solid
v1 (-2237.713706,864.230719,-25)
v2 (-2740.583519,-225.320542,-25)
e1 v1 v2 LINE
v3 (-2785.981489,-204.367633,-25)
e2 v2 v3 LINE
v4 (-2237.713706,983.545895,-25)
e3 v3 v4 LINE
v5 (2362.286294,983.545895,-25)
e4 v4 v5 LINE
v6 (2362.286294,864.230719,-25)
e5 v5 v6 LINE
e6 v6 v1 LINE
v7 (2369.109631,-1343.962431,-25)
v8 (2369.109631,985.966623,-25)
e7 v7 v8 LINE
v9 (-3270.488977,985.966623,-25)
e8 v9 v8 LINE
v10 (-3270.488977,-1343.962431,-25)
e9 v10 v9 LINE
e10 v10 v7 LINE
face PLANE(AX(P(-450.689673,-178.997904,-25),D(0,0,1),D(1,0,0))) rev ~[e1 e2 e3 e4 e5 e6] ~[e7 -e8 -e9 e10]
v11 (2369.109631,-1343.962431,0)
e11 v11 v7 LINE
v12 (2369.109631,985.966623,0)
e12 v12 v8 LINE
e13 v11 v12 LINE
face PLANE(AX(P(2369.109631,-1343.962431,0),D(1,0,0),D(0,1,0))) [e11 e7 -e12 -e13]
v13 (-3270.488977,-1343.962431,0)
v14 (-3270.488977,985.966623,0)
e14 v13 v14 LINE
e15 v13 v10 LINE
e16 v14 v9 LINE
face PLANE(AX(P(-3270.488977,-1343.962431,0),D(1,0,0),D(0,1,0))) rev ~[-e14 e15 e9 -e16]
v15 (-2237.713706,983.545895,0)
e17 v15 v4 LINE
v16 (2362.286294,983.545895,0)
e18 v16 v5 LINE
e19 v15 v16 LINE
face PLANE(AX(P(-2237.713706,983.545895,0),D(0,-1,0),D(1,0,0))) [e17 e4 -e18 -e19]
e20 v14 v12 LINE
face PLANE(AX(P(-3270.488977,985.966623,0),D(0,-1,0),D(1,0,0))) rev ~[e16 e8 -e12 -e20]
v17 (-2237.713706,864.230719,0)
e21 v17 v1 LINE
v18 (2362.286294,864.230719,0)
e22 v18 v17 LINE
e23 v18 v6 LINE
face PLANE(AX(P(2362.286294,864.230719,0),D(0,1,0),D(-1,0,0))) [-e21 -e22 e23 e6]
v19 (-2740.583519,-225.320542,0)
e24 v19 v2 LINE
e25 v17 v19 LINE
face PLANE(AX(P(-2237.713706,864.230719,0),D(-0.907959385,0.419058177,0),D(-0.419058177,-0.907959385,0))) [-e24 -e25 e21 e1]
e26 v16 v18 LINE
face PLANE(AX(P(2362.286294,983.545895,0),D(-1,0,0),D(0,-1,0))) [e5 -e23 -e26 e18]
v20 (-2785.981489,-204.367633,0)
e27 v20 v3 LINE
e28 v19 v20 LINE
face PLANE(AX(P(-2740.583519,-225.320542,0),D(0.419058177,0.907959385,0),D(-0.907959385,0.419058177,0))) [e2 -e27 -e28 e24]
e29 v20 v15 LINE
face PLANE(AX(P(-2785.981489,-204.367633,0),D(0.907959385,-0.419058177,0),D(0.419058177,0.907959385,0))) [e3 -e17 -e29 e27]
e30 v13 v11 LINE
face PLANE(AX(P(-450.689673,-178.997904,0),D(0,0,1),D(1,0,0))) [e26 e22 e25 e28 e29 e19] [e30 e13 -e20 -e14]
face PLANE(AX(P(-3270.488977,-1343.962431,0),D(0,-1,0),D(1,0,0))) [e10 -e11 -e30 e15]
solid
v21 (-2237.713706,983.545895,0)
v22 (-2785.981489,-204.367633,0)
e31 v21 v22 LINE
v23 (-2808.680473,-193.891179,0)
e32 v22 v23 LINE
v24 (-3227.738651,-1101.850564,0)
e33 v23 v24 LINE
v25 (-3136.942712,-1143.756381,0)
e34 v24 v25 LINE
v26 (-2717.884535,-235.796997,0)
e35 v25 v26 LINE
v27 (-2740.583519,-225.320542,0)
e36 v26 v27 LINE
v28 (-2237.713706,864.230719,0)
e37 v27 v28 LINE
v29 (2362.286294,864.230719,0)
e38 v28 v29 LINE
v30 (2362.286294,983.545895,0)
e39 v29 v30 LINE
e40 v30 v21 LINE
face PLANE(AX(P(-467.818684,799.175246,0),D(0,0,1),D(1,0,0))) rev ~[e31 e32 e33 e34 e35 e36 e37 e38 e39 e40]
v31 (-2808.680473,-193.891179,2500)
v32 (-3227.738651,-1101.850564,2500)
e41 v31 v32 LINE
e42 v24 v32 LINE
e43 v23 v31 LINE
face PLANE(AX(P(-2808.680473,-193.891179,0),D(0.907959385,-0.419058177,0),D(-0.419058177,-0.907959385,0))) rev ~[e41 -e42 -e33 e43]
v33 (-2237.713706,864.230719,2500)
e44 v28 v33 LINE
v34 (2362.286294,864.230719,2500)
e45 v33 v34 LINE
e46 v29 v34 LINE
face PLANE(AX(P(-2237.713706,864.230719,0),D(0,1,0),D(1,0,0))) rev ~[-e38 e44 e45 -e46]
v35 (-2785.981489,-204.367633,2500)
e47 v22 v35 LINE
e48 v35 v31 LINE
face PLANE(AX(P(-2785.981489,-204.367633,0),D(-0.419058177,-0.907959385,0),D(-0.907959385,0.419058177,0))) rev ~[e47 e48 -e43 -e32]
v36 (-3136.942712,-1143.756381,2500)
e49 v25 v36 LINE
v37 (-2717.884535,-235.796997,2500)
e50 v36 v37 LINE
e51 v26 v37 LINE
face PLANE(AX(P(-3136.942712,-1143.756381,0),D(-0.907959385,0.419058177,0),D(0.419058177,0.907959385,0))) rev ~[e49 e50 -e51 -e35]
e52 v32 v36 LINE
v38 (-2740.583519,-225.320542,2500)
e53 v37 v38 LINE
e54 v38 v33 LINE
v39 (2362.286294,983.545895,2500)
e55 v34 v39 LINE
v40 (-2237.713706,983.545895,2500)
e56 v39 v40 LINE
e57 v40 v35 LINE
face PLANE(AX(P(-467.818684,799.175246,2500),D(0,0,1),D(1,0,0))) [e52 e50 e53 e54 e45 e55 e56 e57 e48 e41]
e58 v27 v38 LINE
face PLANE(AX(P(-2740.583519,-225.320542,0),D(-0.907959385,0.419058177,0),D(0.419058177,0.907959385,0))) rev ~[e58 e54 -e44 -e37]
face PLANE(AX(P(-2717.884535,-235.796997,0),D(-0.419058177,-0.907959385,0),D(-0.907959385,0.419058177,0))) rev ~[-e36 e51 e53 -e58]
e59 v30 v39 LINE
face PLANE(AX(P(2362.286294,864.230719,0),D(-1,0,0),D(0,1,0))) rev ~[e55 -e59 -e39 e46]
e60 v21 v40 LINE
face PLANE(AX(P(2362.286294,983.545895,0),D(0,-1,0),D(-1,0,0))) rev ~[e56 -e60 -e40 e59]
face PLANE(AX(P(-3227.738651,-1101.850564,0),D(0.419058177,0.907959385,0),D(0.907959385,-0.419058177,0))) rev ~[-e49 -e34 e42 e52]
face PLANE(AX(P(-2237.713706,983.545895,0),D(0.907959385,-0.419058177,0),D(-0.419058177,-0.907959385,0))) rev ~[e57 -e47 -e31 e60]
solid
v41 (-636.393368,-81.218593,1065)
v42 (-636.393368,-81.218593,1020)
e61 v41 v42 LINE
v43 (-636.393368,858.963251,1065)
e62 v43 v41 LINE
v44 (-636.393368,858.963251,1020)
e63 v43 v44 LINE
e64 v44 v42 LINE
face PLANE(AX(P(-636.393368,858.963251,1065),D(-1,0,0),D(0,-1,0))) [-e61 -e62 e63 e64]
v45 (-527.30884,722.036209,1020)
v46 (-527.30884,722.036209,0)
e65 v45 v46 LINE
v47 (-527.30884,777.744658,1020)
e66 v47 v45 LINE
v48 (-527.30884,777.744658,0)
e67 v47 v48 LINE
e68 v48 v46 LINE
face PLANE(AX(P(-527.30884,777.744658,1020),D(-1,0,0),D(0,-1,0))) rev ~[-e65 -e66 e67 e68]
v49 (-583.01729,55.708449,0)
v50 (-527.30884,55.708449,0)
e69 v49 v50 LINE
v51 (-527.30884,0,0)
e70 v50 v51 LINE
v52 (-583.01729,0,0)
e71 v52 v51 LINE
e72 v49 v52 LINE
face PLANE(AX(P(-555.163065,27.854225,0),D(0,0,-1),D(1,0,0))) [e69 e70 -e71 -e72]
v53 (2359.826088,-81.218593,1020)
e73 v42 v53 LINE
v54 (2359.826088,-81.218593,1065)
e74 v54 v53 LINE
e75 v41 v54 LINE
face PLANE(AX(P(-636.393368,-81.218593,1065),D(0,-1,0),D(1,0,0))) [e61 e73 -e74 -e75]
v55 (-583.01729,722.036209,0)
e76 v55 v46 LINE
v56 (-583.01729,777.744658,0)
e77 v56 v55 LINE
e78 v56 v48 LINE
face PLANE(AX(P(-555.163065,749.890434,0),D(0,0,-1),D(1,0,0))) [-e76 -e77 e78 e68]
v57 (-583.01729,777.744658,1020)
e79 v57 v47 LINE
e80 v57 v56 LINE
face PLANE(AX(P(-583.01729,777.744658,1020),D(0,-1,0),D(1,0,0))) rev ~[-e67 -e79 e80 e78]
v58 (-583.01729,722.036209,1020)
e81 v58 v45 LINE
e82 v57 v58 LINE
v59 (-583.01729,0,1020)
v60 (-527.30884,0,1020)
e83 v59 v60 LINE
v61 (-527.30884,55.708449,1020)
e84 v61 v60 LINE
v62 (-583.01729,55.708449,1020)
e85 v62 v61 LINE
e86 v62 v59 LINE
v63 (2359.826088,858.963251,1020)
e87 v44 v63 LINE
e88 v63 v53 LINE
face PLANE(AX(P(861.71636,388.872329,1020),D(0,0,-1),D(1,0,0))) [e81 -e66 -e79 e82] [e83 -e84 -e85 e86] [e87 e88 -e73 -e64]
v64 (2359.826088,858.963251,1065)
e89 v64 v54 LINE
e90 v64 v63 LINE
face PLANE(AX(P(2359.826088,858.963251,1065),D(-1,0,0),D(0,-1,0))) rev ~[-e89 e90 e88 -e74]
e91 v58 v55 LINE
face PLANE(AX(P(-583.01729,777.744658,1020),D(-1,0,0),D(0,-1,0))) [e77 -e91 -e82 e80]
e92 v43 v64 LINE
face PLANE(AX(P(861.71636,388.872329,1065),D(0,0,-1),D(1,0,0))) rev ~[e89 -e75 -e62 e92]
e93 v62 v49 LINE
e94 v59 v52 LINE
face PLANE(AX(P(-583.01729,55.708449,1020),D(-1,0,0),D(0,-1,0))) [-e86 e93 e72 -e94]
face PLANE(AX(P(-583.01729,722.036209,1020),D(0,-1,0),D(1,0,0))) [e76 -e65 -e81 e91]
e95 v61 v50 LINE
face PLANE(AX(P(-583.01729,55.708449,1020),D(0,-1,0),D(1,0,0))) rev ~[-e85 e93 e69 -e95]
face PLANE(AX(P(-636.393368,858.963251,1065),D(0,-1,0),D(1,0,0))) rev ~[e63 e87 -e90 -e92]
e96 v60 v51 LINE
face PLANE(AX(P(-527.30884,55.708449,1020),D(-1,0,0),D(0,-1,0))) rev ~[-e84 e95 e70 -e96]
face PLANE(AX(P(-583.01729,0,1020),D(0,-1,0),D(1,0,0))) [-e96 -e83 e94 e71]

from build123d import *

# Parameters (mm, degrees)
F1_DEPTH = 2500
F3_W     = 2996.2194561958
F3_H     = 940.1818439364
F4_DEPTH = 45
F5_W     = 5639.598608017
F5_H     = 2329.9290537834
F6_DEPTH = 25
F7_W     = 55.7084493339
F7_H     = 55.7084493339
F8_DEPTH = 1020


with BuildPart() as f1:
    # F0 (on Top) → F1 (new body)
    with BuildSketch(Plane.XY):
        Polygon((-2237.7137064844, 864.2307190811), (-637.7137064844, 864.2307190811), (2362.2862935156, 864.2307190811), (2362.2862935156, 983.5458946084), (-2237.7137064844, 983.5458946084), (-2785.9814886635, -204.3676334463), (-2740.5835194385, -225.3205423194), align=None)
        Polygon((-2717.884534826, -235.796996756), (-2740.5835194385, -225.3205423194), (-2785.9814886635, -204.3676334463), (-2808.680473276, -193.8911790098), (-3227.7386507378, -1101.8505635102), (-3136.9427122877, -1143.7563812564), align=None)
    extrude(amount=F1_DEPTH)


with BuildPart() as f4:
    # F3 (on offset) → F4 (new body)
    with BuildSketch(Plane(origin=(0, 0, 1065), x_dir=(1, 0, 0), z_dir=(0, 0, -1))):
        with Locations((861.7163598537, -388.8723291457)):
            Rectangle(F3_W, F3_H)
    extrude(amount=F4_DEPTH)

    # F7 (on face) → F8 (join, through all)
    with BuildSketch(Plane(origin=(0, 0, 1020), x_dir=(1, 0, 0), z_dir=(0, 0, -1))):
        with Locations((-555.1630649716, -27.854224667)):
            Rectangle(F7_W, F7_H)
        with Locations((-555.1630649716, -749.8904336244)):
            Rectangle(F7_W, F7_H)
    extrude(amount=F8_DEPTH)


with BuildPart() as f6:
    # F5 (on face) → F6 (new body)
    with BuildSketch(Plane.XY):
        with Locations((-450.6896734238, -178.9979040623)):
            Rectangle(F5_W, F5_H)
        Polygon((-637.7137064844, 864.2307190811), (-2237.7137064844, 864.2307190811), (-2740.5835194385, -225.3205423194), (-2785.9814886635, -204.3676334463), (-2237.7137064844, 983.5458946084), (2362.2862935156, 983.5458946084), (2362.2862935156, 864.2307190811), align=None, mode=Mode.SUBTRACT)
    extrude(amount=-F6_DEPTH)


solid = Compound([f1.part, f4.part, f6.part])
